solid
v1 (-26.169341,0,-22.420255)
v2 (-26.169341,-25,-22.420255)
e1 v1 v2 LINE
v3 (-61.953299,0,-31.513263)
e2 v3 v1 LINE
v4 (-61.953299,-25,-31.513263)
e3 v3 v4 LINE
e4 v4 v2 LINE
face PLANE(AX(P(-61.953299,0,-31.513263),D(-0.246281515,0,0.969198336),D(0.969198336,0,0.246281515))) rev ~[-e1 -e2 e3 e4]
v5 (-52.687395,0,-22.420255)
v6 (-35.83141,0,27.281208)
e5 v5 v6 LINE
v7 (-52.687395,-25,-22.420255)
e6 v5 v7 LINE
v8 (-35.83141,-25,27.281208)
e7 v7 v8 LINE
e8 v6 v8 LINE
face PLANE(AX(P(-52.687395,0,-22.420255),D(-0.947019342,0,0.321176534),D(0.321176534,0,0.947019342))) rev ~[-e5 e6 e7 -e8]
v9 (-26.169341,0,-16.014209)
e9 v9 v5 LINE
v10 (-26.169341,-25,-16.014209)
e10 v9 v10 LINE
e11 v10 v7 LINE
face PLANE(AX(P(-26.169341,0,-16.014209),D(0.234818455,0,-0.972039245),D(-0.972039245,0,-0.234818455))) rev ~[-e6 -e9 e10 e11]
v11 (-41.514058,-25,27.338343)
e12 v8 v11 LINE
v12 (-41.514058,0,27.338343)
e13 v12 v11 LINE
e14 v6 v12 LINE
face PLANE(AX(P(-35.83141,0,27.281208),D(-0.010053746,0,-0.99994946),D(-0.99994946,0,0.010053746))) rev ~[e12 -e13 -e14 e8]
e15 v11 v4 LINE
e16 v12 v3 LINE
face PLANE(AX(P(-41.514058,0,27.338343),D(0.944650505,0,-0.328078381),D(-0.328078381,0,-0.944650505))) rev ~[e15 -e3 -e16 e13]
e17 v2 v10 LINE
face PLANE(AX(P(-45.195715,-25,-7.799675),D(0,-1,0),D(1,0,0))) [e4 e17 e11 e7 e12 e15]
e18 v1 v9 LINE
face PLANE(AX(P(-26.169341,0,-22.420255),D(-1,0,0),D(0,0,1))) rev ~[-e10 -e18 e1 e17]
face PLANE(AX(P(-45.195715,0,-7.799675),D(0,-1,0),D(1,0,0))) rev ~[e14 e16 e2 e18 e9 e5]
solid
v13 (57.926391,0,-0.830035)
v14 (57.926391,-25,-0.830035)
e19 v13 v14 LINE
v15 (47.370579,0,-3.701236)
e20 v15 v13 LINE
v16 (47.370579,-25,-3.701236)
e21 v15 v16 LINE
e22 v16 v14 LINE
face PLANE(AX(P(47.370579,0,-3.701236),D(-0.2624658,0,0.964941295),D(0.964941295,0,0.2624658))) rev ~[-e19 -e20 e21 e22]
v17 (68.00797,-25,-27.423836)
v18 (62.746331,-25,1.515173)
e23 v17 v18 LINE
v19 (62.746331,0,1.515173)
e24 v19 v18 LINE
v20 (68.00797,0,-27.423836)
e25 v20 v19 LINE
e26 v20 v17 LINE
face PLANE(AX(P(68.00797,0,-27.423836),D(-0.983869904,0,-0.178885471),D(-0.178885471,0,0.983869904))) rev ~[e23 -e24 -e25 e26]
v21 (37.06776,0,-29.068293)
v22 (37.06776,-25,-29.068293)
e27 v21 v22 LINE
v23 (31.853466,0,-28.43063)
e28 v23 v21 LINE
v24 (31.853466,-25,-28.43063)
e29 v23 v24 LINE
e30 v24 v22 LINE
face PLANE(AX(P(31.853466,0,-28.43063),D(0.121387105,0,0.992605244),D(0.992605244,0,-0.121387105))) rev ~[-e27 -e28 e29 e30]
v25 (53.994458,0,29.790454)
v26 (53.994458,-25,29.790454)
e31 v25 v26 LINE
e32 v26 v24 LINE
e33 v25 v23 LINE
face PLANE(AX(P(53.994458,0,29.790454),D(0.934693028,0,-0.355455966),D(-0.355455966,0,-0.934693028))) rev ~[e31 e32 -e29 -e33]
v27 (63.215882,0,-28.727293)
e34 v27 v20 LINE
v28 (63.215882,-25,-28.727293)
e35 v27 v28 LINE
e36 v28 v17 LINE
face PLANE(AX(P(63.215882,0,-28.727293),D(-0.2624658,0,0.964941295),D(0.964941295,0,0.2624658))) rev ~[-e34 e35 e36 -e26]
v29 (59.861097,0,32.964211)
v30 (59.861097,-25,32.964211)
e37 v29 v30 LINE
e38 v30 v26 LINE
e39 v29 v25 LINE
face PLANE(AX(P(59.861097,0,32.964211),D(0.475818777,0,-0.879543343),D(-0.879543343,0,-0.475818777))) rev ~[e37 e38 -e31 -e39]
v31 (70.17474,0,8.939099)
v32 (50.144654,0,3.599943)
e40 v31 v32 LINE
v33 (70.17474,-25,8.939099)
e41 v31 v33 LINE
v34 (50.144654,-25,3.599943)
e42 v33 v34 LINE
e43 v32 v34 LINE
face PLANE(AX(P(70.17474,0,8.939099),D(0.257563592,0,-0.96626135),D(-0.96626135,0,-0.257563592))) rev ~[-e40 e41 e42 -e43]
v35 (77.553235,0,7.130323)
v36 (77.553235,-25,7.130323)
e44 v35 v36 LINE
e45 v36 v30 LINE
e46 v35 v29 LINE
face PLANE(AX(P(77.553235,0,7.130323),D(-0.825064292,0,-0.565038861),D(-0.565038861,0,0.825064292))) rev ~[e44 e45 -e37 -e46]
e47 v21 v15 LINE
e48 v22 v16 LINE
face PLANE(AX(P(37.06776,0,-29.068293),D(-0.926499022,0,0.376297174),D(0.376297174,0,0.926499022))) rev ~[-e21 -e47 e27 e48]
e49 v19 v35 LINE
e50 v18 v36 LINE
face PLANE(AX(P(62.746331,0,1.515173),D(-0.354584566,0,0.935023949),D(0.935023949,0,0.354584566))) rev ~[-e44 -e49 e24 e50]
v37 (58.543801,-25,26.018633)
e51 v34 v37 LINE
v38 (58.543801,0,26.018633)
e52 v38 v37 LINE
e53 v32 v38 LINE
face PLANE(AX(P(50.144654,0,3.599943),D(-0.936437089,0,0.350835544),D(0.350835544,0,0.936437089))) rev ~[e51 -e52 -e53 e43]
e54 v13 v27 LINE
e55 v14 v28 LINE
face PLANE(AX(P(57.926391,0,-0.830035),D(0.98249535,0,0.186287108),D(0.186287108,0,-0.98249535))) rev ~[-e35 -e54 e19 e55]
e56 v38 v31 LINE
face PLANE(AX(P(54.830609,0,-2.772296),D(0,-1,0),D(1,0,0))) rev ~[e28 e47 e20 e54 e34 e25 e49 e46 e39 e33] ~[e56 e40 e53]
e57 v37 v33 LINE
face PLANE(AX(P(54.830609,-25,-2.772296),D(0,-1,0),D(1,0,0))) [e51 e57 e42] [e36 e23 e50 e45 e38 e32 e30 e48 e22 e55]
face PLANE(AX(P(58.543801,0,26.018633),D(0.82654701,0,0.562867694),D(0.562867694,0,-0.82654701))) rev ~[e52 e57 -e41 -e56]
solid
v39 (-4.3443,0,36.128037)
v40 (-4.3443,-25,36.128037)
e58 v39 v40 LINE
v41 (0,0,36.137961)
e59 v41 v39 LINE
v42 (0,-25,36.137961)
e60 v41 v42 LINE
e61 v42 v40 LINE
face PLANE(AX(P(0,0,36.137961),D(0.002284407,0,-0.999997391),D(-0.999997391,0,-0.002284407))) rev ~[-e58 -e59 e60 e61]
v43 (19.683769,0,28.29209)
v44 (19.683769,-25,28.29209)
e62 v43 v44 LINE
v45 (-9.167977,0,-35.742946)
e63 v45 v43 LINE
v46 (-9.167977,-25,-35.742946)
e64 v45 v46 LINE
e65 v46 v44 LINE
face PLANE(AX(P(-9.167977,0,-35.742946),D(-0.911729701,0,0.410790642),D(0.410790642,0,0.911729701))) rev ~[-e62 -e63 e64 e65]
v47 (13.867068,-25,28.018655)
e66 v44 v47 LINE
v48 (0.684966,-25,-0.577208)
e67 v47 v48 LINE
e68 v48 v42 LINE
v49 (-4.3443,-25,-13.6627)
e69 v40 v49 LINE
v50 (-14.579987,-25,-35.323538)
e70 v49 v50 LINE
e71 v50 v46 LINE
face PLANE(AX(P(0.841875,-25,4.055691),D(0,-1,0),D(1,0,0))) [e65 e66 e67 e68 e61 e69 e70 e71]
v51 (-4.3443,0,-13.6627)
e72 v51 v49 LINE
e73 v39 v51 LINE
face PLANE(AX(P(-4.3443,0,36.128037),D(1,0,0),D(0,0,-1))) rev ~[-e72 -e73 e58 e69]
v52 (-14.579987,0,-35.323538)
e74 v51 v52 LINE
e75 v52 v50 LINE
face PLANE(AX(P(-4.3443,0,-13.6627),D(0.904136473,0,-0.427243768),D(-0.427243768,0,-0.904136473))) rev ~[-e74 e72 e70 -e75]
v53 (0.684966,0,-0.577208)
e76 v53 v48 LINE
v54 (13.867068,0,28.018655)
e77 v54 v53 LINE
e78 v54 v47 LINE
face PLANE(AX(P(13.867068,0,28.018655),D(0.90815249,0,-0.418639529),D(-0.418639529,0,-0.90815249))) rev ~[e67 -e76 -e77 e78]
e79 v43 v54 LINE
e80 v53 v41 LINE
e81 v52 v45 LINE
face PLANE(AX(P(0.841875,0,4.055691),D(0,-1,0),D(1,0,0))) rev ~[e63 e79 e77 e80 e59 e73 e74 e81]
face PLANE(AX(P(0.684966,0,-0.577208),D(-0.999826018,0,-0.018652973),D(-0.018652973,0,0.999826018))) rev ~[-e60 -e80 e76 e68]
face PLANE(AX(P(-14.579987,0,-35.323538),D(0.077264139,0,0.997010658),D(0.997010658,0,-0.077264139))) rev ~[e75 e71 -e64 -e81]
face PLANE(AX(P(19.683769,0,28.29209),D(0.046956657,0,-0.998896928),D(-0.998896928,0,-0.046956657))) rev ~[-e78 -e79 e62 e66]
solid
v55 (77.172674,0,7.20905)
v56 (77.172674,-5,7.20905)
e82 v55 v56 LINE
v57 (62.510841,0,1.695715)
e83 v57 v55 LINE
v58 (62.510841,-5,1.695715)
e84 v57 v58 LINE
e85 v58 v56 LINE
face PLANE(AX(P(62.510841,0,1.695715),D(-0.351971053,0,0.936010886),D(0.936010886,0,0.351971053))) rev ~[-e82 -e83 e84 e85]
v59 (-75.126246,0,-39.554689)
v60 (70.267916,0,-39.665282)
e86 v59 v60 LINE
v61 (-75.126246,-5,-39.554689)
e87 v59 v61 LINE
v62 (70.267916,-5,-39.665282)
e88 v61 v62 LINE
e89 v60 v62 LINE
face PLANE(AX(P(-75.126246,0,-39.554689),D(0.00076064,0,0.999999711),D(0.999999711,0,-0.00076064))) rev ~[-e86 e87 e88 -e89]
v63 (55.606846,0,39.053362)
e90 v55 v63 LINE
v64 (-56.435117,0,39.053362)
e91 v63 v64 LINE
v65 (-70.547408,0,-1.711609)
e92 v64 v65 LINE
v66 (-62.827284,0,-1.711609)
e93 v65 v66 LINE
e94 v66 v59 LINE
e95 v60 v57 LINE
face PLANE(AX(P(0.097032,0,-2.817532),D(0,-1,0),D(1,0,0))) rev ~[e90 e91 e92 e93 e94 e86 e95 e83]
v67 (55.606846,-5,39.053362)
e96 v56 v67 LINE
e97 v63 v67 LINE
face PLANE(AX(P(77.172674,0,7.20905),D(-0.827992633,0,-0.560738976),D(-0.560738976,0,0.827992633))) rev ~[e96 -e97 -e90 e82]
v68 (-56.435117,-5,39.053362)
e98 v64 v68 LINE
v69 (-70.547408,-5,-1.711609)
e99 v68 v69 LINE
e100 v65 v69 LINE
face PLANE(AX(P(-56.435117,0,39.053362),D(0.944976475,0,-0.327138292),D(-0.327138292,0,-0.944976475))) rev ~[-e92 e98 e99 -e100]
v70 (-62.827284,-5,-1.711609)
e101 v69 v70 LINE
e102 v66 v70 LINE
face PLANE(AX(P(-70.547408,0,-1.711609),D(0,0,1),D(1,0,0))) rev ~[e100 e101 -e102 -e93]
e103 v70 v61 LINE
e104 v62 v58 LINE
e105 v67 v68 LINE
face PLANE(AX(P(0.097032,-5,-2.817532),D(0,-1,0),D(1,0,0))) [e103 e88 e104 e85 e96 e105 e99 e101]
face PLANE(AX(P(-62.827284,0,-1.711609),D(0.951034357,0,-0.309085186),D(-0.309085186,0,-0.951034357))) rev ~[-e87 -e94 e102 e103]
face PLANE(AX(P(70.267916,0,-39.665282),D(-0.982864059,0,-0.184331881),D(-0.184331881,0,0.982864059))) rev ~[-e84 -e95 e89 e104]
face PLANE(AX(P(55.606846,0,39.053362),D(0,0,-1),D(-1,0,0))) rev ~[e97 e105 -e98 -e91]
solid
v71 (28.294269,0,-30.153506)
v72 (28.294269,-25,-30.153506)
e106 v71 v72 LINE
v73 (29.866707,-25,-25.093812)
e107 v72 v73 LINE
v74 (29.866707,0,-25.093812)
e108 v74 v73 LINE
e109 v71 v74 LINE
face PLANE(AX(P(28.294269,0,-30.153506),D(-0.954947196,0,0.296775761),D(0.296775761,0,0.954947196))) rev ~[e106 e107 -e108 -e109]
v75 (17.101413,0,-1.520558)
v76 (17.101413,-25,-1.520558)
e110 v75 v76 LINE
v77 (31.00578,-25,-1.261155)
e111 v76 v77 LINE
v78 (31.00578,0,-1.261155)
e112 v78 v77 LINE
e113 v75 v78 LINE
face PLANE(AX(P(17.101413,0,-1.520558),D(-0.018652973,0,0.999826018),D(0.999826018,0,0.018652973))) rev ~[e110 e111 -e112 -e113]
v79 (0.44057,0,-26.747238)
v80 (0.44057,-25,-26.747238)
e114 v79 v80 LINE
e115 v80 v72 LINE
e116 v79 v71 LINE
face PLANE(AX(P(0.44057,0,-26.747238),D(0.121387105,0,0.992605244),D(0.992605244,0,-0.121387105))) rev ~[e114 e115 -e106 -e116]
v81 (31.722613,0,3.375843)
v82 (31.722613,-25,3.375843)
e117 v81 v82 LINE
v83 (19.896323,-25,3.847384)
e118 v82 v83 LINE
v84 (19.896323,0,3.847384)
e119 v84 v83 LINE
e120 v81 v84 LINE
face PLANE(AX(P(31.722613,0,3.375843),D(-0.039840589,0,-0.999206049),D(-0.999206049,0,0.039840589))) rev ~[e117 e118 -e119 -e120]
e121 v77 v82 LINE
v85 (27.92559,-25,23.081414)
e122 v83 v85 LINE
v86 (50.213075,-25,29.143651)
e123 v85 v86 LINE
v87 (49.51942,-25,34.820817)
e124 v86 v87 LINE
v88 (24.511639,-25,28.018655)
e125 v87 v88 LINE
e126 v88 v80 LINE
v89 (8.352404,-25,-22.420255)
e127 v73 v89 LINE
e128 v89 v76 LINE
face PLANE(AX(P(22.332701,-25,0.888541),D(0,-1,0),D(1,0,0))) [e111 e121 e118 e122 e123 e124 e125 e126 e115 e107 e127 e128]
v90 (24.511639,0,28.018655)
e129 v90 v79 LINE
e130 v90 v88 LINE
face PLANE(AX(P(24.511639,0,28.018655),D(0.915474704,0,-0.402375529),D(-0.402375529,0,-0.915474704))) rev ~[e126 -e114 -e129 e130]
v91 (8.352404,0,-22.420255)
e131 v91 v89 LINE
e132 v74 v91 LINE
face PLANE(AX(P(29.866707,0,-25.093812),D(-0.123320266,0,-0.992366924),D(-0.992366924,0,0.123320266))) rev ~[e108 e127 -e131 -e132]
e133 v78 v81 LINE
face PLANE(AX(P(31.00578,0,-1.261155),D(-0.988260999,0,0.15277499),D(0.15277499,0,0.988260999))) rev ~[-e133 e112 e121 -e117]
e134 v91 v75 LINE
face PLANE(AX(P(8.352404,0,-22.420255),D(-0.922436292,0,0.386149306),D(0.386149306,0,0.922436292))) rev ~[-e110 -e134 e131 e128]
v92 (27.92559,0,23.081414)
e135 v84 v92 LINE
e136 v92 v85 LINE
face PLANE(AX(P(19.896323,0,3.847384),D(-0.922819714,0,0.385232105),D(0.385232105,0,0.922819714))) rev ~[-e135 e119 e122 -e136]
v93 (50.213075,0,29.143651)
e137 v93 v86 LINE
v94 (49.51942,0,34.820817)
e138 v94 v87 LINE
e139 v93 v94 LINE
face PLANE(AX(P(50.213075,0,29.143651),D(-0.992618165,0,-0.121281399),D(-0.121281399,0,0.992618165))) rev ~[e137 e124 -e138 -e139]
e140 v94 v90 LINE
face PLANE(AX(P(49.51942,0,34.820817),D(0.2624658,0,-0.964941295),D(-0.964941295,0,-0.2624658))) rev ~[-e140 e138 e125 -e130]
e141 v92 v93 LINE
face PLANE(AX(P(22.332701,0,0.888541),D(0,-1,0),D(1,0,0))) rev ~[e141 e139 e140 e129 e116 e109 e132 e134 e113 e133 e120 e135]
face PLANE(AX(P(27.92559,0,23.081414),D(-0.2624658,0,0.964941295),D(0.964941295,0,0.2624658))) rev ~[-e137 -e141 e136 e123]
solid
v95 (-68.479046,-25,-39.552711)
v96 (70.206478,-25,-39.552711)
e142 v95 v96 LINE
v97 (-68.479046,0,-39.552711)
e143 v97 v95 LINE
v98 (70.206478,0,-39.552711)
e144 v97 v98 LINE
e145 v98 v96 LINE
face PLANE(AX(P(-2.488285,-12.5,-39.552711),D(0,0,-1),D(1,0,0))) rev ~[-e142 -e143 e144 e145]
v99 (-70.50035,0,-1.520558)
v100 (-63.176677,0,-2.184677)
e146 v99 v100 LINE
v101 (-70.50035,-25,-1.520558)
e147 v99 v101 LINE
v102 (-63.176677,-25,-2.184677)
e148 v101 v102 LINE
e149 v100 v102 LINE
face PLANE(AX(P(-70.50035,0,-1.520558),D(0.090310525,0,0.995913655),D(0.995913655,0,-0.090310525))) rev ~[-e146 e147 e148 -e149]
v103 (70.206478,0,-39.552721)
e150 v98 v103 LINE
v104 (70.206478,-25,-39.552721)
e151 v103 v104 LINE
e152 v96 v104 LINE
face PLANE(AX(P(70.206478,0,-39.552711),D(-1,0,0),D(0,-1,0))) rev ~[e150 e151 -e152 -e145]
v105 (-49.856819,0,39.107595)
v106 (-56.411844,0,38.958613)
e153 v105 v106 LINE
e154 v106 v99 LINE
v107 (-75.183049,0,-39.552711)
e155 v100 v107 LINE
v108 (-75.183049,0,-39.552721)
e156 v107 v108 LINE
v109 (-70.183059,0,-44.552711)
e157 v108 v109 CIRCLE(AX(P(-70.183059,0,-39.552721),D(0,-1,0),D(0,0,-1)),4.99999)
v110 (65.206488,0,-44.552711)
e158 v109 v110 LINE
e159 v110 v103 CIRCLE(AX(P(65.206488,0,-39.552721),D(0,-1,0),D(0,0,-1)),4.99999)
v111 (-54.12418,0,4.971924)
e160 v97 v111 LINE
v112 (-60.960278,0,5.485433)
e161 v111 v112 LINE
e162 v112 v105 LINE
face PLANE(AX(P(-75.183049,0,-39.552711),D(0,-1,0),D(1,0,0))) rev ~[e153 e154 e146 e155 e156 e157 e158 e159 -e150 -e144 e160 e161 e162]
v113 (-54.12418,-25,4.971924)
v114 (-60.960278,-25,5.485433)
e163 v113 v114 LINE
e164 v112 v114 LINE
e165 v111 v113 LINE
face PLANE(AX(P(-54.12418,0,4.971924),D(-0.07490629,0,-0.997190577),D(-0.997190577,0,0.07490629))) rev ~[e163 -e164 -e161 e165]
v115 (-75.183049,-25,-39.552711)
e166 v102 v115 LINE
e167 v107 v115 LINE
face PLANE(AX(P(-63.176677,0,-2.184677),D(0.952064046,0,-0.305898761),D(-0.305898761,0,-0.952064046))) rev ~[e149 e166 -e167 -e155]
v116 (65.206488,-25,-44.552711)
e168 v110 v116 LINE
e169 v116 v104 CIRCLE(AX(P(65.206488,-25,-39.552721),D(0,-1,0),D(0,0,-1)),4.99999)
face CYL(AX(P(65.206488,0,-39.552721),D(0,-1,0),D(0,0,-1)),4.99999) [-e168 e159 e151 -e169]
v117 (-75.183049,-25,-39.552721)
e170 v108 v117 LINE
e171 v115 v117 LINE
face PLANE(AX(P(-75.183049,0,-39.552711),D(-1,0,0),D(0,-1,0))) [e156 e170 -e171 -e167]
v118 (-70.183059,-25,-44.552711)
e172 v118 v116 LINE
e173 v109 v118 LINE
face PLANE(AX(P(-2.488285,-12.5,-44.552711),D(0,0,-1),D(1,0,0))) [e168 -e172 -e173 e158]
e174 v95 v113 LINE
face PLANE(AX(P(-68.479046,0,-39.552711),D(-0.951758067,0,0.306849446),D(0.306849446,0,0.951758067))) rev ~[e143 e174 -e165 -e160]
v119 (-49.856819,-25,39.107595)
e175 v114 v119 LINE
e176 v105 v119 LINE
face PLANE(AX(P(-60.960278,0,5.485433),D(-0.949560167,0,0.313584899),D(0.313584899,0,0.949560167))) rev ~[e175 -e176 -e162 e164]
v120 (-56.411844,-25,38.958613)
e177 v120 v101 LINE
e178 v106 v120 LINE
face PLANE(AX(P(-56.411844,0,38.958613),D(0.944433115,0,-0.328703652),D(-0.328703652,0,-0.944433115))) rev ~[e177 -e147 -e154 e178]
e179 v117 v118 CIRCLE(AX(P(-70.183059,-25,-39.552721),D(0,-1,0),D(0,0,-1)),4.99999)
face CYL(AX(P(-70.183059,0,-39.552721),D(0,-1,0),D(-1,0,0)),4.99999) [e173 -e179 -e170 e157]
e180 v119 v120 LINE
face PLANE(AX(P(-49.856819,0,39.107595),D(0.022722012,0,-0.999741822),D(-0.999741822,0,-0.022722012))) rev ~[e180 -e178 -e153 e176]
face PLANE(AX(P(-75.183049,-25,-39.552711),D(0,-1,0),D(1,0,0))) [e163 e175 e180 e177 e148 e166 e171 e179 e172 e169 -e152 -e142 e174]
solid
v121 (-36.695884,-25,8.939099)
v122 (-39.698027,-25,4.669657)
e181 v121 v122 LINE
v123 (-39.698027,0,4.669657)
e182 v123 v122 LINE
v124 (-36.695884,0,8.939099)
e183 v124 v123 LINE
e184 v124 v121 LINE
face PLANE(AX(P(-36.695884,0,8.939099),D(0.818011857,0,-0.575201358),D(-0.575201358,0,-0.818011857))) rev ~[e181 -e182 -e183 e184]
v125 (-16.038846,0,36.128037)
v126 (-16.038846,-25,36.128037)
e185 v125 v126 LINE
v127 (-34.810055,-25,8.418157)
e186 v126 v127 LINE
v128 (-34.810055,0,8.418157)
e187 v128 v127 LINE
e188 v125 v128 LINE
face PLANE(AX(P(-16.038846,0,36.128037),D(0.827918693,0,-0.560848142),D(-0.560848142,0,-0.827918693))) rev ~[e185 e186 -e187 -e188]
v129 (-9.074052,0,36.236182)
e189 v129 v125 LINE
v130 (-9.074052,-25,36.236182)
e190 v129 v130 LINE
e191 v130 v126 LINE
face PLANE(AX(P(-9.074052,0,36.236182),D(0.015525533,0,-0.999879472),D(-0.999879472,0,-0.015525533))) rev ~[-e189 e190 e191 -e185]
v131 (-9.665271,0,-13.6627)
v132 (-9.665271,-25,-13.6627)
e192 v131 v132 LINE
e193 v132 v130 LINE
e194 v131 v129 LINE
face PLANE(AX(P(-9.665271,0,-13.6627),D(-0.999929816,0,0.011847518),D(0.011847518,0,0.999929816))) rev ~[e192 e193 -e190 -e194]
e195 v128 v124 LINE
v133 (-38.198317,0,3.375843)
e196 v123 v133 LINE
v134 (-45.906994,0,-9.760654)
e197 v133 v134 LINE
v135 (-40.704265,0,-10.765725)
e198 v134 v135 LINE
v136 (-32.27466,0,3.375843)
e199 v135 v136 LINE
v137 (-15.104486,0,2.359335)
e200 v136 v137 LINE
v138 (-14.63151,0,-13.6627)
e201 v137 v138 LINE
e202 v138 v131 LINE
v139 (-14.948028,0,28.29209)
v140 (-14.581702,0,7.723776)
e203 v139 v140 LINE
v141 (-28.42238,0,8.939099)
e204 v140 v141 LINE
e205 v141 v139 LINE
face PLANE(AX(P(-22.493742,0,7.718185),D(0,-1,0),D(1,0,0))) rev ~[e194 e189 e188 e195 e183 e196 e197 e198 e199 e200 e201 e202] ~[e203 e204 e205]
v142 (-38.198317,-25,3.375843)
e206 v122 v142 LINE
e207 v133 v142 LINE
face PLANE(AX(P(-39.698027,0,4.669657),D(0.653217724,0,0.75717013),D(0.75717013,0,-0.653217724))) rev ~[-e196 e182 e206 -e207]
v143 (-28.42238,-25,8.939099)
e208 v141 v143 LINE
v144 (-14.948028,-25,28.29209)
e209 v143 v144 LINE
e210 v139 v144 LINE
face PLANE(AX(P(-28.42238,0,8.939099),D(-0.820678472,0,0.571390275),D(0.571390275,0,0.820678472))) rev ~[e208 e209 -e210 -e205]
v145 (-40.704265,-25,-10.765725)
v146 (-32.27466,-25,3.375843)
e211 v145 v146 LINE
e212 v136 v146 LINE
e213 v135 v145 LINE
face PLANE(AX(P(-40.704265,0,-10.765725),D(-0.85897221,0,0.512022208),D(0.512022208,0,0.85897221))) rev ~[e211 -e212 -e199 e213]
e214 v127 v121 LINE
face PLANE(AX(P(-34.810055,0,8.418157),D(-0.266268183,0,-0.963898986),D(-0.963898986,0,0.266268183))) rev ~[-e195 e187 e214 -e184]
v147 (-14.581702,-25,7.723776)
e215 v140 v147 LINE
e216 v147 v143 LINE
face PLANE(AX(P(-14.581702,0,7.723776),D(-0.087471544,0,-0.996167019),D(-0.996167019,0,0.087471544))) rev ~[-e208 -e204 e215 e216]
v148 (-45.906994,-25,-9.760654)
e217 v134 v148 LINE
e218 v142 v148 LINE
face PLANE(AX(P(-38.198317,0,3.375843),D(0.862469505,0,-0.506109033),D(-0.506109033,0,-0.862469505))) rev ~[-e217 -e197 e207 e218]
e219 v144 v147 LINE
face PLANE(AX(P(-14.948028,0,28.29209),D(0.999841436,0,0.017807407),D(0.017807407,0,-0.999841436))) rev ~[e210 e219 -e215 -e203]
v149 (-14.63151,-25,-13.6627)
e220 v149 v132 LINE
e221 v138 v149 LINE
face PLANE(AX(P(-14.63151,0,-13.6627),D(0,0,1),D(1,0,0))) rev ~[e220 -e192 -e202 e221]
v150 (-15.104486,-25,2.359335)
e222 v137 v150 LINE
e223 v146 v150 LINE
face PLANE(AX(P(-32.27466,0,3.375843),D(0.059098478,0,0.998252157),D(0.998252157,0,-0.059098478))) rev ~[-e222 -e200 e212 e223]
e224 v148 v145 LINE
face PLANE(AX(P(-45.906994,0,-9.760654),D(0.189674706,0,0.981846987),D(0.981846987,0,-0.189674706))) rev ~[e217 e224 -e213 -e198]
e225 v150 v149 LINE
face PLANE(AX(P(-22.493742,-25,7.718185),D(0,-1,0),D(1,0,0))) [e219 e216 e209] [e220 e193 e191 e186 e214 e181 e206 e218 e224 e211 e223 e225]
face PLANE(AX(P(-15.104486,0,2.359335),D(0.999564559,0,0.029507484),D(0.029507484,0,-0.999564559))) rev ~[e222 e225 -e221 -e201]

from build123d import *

# Parameters (mm, degrees)
F1_DEPTH = 25
F2_W     = 145.3895270824
F2_H     = 25
F3_DEPTH = 5
F5_DEPTH = 5
F6_R     = 4.99999


# Not quite as in the source:
# - a fillet or chamfer is up to 0.001 mm smaller than in the source, because OpenCascade refuses the exact size


with BuildPart() as f1:
    # F0 (on Front) → F1 (new body)
    with BuildSketch(Plane.XZ):
        Polygon((-49.8568192124, 39.1075946391), (-56.4118437469, 38.9586128294), (-70.5003495435, -1.5205583768), (-63.176676631, -2.1846769378), (-75.1830488443, -39.5527109504), (-68.4790462255, -39.5527109504), (-54.1241802275, 4.9719237722), (-60.960277915, 5.4854331538), align=None)
    extrude(amount=F1_DEPTH)

    # F2 (on face) → F3 (join)
    with BuildSketch(Plane(origin=(0, 0, -39.5527109504), x_dir=(1, 0, 0), z_dir=(0, 0, -1))):
        with Locations((-2.4882853031, 12.5)):
            Rectangle(F2_W, F2_H)
    extrude(amount=F3_DEPTH)

    # F6 (radius 5 in the source; OpenCascade refuses exactly that, so slightly less here)
    f6_edges = [f1.edges().sort_by_distance(p)[0] for p in [
        (70.206478, -12.5, -44.552711),
        (-75.183049, -12.5, -44.552711),
    ]]
    fillet(f6_edges, radius=F6_R)


with BuildPart() as f1b:
    # F0 (on Front) → F1, piece 2 (new body)
    with BuildSketch(Plane.XZ):
        Polygon((-52.687395364, -22.4202554673), (-35.8314104378, 27.2812079638), (-41.5140576661, 27.3383427411), (-61.9532987475, -31.5132625401), (-26.1693410575, -22.4202554673), (-26.1693410575, -16.0142090172), align=None)
    extrude(amount=F1_DEPTH)


with BuildPart() as f1c:
    # F0 (on Front) → F1, piece 3 (new body)
    with BuildSketch(Plane.XZ):
        Polygon((-9.0740518644, 36.2361818552), (-16.0388462245, 36.1280366778), (-34.8100550473, 8.4181567654), (-36.6958837116, 8.9390994981), (-39.6980270743, 4.6696574427), (-38.1983165081, 3.3758431673), (-45.9069944918, -9.7606536001), (-40.7042652369, -10.7657248154), (-32.274659742, 3.3758431673), (-15.1044856757, 2.3593353108), (-14.6315097809, -13.66269961), (-9.6652712673, -13.66269961), align=None)
        Polygon((-14.9480281398, 28.2920897007), (-14.5817017183, 7.7237756923), (-28.4223798662, 8.9390994981), align=None, mode=Mode.SUBTRACT)
    extrude(amount=F1_DEPTH)


with BuildPart() as f1d:
    # F0 (on Front) → F1, piece 4 (new body)
    with BuildSketch(Plane.XZ):
        Polygon((0, 36.1379608512), (-4.3442999013, 36.1280366778), (-4.3442999013, -13.66269961), (-14.5799871534, -35.3235378861), (-9.1679766774, -35.7429459691), (19.6837689728, 28.2920897007), (13.8670681044, 28.0186552554), (0.6849662168, -0.5772078293), align=None)
    extrude(amount=F1_DEPTH)


with BuildPart() as f1e:
    # F0 (on Front) → F1, piece 5 (new body)
    with BuildSketch(Plane.XZ):
        Polygon((50.2130747932, 29.1436510876), (49.5194196701, 34.8208174109), (24.5116390288, 28.0186552554), (0.4405695072, -26.747237891), (28.2942693621, -30.153506403), (29.8667065799, -25.0938124955), (8.352403529, -22.4202554673), (17.101412639, -1.5205583768), (31.0057803671, -1.2611554515), (31.722612679, 3.3758431673), (19.8963228613, 3.847383894), (27.9255900532, 23.0814144015), align=None)
    extrude(amount=F1_DEPTH)


with BuildPart() as f1f:
    # F0 (on Front) → F1, piece 6 (new body)
    with BuildSketch(Plane.XZ):
        Polygon((59.8610974848, 32.9642109573), (53.9944581687, 29.7904536128), (31.8534656095, -28.4306296104), (37.0677597821, -29.0682930499), (47.3705790937, -3.7012356333), (57.9263914569, -0.8300353294), (63.2158815861, -28.7272930145), (68.0079700506, -27.4238361718), (62.7463310957, 1.5151726548), (77.5532349944, 7.1303225122), align=None)
        Polygon((50.1446537673, 3.5999426618), (58.5438013077, 26.0186325759), (70.1747397517, 8.9390994981), align=None, mode=Mode.SUBTRACT)
    extrude(amount=F1_DEPTH)


with BuildPart() as f5:
    # F4 (on Front) → F5 (new body)
    with BuildSketch(Plane.XZ):
        Polygon((-62.827283707, -1.7116093077), (-75.1262456179, -39.5546890795), (70.2679157257, -39.6652817726), (62.5108405948, 1.6957151238), (77.1726742387, 7.2090495378), (55.6068457663, 39.0533618629), (-56.435116975, 39.0533618629), (-70.547408027, -1.7116093077), align=None)
    extrude(amount=F5_DEPTH)


solid = Compound([f1.part, f1b.part, f1c.part, f1d.part, f1e.part, f1f.part, f5.part])
